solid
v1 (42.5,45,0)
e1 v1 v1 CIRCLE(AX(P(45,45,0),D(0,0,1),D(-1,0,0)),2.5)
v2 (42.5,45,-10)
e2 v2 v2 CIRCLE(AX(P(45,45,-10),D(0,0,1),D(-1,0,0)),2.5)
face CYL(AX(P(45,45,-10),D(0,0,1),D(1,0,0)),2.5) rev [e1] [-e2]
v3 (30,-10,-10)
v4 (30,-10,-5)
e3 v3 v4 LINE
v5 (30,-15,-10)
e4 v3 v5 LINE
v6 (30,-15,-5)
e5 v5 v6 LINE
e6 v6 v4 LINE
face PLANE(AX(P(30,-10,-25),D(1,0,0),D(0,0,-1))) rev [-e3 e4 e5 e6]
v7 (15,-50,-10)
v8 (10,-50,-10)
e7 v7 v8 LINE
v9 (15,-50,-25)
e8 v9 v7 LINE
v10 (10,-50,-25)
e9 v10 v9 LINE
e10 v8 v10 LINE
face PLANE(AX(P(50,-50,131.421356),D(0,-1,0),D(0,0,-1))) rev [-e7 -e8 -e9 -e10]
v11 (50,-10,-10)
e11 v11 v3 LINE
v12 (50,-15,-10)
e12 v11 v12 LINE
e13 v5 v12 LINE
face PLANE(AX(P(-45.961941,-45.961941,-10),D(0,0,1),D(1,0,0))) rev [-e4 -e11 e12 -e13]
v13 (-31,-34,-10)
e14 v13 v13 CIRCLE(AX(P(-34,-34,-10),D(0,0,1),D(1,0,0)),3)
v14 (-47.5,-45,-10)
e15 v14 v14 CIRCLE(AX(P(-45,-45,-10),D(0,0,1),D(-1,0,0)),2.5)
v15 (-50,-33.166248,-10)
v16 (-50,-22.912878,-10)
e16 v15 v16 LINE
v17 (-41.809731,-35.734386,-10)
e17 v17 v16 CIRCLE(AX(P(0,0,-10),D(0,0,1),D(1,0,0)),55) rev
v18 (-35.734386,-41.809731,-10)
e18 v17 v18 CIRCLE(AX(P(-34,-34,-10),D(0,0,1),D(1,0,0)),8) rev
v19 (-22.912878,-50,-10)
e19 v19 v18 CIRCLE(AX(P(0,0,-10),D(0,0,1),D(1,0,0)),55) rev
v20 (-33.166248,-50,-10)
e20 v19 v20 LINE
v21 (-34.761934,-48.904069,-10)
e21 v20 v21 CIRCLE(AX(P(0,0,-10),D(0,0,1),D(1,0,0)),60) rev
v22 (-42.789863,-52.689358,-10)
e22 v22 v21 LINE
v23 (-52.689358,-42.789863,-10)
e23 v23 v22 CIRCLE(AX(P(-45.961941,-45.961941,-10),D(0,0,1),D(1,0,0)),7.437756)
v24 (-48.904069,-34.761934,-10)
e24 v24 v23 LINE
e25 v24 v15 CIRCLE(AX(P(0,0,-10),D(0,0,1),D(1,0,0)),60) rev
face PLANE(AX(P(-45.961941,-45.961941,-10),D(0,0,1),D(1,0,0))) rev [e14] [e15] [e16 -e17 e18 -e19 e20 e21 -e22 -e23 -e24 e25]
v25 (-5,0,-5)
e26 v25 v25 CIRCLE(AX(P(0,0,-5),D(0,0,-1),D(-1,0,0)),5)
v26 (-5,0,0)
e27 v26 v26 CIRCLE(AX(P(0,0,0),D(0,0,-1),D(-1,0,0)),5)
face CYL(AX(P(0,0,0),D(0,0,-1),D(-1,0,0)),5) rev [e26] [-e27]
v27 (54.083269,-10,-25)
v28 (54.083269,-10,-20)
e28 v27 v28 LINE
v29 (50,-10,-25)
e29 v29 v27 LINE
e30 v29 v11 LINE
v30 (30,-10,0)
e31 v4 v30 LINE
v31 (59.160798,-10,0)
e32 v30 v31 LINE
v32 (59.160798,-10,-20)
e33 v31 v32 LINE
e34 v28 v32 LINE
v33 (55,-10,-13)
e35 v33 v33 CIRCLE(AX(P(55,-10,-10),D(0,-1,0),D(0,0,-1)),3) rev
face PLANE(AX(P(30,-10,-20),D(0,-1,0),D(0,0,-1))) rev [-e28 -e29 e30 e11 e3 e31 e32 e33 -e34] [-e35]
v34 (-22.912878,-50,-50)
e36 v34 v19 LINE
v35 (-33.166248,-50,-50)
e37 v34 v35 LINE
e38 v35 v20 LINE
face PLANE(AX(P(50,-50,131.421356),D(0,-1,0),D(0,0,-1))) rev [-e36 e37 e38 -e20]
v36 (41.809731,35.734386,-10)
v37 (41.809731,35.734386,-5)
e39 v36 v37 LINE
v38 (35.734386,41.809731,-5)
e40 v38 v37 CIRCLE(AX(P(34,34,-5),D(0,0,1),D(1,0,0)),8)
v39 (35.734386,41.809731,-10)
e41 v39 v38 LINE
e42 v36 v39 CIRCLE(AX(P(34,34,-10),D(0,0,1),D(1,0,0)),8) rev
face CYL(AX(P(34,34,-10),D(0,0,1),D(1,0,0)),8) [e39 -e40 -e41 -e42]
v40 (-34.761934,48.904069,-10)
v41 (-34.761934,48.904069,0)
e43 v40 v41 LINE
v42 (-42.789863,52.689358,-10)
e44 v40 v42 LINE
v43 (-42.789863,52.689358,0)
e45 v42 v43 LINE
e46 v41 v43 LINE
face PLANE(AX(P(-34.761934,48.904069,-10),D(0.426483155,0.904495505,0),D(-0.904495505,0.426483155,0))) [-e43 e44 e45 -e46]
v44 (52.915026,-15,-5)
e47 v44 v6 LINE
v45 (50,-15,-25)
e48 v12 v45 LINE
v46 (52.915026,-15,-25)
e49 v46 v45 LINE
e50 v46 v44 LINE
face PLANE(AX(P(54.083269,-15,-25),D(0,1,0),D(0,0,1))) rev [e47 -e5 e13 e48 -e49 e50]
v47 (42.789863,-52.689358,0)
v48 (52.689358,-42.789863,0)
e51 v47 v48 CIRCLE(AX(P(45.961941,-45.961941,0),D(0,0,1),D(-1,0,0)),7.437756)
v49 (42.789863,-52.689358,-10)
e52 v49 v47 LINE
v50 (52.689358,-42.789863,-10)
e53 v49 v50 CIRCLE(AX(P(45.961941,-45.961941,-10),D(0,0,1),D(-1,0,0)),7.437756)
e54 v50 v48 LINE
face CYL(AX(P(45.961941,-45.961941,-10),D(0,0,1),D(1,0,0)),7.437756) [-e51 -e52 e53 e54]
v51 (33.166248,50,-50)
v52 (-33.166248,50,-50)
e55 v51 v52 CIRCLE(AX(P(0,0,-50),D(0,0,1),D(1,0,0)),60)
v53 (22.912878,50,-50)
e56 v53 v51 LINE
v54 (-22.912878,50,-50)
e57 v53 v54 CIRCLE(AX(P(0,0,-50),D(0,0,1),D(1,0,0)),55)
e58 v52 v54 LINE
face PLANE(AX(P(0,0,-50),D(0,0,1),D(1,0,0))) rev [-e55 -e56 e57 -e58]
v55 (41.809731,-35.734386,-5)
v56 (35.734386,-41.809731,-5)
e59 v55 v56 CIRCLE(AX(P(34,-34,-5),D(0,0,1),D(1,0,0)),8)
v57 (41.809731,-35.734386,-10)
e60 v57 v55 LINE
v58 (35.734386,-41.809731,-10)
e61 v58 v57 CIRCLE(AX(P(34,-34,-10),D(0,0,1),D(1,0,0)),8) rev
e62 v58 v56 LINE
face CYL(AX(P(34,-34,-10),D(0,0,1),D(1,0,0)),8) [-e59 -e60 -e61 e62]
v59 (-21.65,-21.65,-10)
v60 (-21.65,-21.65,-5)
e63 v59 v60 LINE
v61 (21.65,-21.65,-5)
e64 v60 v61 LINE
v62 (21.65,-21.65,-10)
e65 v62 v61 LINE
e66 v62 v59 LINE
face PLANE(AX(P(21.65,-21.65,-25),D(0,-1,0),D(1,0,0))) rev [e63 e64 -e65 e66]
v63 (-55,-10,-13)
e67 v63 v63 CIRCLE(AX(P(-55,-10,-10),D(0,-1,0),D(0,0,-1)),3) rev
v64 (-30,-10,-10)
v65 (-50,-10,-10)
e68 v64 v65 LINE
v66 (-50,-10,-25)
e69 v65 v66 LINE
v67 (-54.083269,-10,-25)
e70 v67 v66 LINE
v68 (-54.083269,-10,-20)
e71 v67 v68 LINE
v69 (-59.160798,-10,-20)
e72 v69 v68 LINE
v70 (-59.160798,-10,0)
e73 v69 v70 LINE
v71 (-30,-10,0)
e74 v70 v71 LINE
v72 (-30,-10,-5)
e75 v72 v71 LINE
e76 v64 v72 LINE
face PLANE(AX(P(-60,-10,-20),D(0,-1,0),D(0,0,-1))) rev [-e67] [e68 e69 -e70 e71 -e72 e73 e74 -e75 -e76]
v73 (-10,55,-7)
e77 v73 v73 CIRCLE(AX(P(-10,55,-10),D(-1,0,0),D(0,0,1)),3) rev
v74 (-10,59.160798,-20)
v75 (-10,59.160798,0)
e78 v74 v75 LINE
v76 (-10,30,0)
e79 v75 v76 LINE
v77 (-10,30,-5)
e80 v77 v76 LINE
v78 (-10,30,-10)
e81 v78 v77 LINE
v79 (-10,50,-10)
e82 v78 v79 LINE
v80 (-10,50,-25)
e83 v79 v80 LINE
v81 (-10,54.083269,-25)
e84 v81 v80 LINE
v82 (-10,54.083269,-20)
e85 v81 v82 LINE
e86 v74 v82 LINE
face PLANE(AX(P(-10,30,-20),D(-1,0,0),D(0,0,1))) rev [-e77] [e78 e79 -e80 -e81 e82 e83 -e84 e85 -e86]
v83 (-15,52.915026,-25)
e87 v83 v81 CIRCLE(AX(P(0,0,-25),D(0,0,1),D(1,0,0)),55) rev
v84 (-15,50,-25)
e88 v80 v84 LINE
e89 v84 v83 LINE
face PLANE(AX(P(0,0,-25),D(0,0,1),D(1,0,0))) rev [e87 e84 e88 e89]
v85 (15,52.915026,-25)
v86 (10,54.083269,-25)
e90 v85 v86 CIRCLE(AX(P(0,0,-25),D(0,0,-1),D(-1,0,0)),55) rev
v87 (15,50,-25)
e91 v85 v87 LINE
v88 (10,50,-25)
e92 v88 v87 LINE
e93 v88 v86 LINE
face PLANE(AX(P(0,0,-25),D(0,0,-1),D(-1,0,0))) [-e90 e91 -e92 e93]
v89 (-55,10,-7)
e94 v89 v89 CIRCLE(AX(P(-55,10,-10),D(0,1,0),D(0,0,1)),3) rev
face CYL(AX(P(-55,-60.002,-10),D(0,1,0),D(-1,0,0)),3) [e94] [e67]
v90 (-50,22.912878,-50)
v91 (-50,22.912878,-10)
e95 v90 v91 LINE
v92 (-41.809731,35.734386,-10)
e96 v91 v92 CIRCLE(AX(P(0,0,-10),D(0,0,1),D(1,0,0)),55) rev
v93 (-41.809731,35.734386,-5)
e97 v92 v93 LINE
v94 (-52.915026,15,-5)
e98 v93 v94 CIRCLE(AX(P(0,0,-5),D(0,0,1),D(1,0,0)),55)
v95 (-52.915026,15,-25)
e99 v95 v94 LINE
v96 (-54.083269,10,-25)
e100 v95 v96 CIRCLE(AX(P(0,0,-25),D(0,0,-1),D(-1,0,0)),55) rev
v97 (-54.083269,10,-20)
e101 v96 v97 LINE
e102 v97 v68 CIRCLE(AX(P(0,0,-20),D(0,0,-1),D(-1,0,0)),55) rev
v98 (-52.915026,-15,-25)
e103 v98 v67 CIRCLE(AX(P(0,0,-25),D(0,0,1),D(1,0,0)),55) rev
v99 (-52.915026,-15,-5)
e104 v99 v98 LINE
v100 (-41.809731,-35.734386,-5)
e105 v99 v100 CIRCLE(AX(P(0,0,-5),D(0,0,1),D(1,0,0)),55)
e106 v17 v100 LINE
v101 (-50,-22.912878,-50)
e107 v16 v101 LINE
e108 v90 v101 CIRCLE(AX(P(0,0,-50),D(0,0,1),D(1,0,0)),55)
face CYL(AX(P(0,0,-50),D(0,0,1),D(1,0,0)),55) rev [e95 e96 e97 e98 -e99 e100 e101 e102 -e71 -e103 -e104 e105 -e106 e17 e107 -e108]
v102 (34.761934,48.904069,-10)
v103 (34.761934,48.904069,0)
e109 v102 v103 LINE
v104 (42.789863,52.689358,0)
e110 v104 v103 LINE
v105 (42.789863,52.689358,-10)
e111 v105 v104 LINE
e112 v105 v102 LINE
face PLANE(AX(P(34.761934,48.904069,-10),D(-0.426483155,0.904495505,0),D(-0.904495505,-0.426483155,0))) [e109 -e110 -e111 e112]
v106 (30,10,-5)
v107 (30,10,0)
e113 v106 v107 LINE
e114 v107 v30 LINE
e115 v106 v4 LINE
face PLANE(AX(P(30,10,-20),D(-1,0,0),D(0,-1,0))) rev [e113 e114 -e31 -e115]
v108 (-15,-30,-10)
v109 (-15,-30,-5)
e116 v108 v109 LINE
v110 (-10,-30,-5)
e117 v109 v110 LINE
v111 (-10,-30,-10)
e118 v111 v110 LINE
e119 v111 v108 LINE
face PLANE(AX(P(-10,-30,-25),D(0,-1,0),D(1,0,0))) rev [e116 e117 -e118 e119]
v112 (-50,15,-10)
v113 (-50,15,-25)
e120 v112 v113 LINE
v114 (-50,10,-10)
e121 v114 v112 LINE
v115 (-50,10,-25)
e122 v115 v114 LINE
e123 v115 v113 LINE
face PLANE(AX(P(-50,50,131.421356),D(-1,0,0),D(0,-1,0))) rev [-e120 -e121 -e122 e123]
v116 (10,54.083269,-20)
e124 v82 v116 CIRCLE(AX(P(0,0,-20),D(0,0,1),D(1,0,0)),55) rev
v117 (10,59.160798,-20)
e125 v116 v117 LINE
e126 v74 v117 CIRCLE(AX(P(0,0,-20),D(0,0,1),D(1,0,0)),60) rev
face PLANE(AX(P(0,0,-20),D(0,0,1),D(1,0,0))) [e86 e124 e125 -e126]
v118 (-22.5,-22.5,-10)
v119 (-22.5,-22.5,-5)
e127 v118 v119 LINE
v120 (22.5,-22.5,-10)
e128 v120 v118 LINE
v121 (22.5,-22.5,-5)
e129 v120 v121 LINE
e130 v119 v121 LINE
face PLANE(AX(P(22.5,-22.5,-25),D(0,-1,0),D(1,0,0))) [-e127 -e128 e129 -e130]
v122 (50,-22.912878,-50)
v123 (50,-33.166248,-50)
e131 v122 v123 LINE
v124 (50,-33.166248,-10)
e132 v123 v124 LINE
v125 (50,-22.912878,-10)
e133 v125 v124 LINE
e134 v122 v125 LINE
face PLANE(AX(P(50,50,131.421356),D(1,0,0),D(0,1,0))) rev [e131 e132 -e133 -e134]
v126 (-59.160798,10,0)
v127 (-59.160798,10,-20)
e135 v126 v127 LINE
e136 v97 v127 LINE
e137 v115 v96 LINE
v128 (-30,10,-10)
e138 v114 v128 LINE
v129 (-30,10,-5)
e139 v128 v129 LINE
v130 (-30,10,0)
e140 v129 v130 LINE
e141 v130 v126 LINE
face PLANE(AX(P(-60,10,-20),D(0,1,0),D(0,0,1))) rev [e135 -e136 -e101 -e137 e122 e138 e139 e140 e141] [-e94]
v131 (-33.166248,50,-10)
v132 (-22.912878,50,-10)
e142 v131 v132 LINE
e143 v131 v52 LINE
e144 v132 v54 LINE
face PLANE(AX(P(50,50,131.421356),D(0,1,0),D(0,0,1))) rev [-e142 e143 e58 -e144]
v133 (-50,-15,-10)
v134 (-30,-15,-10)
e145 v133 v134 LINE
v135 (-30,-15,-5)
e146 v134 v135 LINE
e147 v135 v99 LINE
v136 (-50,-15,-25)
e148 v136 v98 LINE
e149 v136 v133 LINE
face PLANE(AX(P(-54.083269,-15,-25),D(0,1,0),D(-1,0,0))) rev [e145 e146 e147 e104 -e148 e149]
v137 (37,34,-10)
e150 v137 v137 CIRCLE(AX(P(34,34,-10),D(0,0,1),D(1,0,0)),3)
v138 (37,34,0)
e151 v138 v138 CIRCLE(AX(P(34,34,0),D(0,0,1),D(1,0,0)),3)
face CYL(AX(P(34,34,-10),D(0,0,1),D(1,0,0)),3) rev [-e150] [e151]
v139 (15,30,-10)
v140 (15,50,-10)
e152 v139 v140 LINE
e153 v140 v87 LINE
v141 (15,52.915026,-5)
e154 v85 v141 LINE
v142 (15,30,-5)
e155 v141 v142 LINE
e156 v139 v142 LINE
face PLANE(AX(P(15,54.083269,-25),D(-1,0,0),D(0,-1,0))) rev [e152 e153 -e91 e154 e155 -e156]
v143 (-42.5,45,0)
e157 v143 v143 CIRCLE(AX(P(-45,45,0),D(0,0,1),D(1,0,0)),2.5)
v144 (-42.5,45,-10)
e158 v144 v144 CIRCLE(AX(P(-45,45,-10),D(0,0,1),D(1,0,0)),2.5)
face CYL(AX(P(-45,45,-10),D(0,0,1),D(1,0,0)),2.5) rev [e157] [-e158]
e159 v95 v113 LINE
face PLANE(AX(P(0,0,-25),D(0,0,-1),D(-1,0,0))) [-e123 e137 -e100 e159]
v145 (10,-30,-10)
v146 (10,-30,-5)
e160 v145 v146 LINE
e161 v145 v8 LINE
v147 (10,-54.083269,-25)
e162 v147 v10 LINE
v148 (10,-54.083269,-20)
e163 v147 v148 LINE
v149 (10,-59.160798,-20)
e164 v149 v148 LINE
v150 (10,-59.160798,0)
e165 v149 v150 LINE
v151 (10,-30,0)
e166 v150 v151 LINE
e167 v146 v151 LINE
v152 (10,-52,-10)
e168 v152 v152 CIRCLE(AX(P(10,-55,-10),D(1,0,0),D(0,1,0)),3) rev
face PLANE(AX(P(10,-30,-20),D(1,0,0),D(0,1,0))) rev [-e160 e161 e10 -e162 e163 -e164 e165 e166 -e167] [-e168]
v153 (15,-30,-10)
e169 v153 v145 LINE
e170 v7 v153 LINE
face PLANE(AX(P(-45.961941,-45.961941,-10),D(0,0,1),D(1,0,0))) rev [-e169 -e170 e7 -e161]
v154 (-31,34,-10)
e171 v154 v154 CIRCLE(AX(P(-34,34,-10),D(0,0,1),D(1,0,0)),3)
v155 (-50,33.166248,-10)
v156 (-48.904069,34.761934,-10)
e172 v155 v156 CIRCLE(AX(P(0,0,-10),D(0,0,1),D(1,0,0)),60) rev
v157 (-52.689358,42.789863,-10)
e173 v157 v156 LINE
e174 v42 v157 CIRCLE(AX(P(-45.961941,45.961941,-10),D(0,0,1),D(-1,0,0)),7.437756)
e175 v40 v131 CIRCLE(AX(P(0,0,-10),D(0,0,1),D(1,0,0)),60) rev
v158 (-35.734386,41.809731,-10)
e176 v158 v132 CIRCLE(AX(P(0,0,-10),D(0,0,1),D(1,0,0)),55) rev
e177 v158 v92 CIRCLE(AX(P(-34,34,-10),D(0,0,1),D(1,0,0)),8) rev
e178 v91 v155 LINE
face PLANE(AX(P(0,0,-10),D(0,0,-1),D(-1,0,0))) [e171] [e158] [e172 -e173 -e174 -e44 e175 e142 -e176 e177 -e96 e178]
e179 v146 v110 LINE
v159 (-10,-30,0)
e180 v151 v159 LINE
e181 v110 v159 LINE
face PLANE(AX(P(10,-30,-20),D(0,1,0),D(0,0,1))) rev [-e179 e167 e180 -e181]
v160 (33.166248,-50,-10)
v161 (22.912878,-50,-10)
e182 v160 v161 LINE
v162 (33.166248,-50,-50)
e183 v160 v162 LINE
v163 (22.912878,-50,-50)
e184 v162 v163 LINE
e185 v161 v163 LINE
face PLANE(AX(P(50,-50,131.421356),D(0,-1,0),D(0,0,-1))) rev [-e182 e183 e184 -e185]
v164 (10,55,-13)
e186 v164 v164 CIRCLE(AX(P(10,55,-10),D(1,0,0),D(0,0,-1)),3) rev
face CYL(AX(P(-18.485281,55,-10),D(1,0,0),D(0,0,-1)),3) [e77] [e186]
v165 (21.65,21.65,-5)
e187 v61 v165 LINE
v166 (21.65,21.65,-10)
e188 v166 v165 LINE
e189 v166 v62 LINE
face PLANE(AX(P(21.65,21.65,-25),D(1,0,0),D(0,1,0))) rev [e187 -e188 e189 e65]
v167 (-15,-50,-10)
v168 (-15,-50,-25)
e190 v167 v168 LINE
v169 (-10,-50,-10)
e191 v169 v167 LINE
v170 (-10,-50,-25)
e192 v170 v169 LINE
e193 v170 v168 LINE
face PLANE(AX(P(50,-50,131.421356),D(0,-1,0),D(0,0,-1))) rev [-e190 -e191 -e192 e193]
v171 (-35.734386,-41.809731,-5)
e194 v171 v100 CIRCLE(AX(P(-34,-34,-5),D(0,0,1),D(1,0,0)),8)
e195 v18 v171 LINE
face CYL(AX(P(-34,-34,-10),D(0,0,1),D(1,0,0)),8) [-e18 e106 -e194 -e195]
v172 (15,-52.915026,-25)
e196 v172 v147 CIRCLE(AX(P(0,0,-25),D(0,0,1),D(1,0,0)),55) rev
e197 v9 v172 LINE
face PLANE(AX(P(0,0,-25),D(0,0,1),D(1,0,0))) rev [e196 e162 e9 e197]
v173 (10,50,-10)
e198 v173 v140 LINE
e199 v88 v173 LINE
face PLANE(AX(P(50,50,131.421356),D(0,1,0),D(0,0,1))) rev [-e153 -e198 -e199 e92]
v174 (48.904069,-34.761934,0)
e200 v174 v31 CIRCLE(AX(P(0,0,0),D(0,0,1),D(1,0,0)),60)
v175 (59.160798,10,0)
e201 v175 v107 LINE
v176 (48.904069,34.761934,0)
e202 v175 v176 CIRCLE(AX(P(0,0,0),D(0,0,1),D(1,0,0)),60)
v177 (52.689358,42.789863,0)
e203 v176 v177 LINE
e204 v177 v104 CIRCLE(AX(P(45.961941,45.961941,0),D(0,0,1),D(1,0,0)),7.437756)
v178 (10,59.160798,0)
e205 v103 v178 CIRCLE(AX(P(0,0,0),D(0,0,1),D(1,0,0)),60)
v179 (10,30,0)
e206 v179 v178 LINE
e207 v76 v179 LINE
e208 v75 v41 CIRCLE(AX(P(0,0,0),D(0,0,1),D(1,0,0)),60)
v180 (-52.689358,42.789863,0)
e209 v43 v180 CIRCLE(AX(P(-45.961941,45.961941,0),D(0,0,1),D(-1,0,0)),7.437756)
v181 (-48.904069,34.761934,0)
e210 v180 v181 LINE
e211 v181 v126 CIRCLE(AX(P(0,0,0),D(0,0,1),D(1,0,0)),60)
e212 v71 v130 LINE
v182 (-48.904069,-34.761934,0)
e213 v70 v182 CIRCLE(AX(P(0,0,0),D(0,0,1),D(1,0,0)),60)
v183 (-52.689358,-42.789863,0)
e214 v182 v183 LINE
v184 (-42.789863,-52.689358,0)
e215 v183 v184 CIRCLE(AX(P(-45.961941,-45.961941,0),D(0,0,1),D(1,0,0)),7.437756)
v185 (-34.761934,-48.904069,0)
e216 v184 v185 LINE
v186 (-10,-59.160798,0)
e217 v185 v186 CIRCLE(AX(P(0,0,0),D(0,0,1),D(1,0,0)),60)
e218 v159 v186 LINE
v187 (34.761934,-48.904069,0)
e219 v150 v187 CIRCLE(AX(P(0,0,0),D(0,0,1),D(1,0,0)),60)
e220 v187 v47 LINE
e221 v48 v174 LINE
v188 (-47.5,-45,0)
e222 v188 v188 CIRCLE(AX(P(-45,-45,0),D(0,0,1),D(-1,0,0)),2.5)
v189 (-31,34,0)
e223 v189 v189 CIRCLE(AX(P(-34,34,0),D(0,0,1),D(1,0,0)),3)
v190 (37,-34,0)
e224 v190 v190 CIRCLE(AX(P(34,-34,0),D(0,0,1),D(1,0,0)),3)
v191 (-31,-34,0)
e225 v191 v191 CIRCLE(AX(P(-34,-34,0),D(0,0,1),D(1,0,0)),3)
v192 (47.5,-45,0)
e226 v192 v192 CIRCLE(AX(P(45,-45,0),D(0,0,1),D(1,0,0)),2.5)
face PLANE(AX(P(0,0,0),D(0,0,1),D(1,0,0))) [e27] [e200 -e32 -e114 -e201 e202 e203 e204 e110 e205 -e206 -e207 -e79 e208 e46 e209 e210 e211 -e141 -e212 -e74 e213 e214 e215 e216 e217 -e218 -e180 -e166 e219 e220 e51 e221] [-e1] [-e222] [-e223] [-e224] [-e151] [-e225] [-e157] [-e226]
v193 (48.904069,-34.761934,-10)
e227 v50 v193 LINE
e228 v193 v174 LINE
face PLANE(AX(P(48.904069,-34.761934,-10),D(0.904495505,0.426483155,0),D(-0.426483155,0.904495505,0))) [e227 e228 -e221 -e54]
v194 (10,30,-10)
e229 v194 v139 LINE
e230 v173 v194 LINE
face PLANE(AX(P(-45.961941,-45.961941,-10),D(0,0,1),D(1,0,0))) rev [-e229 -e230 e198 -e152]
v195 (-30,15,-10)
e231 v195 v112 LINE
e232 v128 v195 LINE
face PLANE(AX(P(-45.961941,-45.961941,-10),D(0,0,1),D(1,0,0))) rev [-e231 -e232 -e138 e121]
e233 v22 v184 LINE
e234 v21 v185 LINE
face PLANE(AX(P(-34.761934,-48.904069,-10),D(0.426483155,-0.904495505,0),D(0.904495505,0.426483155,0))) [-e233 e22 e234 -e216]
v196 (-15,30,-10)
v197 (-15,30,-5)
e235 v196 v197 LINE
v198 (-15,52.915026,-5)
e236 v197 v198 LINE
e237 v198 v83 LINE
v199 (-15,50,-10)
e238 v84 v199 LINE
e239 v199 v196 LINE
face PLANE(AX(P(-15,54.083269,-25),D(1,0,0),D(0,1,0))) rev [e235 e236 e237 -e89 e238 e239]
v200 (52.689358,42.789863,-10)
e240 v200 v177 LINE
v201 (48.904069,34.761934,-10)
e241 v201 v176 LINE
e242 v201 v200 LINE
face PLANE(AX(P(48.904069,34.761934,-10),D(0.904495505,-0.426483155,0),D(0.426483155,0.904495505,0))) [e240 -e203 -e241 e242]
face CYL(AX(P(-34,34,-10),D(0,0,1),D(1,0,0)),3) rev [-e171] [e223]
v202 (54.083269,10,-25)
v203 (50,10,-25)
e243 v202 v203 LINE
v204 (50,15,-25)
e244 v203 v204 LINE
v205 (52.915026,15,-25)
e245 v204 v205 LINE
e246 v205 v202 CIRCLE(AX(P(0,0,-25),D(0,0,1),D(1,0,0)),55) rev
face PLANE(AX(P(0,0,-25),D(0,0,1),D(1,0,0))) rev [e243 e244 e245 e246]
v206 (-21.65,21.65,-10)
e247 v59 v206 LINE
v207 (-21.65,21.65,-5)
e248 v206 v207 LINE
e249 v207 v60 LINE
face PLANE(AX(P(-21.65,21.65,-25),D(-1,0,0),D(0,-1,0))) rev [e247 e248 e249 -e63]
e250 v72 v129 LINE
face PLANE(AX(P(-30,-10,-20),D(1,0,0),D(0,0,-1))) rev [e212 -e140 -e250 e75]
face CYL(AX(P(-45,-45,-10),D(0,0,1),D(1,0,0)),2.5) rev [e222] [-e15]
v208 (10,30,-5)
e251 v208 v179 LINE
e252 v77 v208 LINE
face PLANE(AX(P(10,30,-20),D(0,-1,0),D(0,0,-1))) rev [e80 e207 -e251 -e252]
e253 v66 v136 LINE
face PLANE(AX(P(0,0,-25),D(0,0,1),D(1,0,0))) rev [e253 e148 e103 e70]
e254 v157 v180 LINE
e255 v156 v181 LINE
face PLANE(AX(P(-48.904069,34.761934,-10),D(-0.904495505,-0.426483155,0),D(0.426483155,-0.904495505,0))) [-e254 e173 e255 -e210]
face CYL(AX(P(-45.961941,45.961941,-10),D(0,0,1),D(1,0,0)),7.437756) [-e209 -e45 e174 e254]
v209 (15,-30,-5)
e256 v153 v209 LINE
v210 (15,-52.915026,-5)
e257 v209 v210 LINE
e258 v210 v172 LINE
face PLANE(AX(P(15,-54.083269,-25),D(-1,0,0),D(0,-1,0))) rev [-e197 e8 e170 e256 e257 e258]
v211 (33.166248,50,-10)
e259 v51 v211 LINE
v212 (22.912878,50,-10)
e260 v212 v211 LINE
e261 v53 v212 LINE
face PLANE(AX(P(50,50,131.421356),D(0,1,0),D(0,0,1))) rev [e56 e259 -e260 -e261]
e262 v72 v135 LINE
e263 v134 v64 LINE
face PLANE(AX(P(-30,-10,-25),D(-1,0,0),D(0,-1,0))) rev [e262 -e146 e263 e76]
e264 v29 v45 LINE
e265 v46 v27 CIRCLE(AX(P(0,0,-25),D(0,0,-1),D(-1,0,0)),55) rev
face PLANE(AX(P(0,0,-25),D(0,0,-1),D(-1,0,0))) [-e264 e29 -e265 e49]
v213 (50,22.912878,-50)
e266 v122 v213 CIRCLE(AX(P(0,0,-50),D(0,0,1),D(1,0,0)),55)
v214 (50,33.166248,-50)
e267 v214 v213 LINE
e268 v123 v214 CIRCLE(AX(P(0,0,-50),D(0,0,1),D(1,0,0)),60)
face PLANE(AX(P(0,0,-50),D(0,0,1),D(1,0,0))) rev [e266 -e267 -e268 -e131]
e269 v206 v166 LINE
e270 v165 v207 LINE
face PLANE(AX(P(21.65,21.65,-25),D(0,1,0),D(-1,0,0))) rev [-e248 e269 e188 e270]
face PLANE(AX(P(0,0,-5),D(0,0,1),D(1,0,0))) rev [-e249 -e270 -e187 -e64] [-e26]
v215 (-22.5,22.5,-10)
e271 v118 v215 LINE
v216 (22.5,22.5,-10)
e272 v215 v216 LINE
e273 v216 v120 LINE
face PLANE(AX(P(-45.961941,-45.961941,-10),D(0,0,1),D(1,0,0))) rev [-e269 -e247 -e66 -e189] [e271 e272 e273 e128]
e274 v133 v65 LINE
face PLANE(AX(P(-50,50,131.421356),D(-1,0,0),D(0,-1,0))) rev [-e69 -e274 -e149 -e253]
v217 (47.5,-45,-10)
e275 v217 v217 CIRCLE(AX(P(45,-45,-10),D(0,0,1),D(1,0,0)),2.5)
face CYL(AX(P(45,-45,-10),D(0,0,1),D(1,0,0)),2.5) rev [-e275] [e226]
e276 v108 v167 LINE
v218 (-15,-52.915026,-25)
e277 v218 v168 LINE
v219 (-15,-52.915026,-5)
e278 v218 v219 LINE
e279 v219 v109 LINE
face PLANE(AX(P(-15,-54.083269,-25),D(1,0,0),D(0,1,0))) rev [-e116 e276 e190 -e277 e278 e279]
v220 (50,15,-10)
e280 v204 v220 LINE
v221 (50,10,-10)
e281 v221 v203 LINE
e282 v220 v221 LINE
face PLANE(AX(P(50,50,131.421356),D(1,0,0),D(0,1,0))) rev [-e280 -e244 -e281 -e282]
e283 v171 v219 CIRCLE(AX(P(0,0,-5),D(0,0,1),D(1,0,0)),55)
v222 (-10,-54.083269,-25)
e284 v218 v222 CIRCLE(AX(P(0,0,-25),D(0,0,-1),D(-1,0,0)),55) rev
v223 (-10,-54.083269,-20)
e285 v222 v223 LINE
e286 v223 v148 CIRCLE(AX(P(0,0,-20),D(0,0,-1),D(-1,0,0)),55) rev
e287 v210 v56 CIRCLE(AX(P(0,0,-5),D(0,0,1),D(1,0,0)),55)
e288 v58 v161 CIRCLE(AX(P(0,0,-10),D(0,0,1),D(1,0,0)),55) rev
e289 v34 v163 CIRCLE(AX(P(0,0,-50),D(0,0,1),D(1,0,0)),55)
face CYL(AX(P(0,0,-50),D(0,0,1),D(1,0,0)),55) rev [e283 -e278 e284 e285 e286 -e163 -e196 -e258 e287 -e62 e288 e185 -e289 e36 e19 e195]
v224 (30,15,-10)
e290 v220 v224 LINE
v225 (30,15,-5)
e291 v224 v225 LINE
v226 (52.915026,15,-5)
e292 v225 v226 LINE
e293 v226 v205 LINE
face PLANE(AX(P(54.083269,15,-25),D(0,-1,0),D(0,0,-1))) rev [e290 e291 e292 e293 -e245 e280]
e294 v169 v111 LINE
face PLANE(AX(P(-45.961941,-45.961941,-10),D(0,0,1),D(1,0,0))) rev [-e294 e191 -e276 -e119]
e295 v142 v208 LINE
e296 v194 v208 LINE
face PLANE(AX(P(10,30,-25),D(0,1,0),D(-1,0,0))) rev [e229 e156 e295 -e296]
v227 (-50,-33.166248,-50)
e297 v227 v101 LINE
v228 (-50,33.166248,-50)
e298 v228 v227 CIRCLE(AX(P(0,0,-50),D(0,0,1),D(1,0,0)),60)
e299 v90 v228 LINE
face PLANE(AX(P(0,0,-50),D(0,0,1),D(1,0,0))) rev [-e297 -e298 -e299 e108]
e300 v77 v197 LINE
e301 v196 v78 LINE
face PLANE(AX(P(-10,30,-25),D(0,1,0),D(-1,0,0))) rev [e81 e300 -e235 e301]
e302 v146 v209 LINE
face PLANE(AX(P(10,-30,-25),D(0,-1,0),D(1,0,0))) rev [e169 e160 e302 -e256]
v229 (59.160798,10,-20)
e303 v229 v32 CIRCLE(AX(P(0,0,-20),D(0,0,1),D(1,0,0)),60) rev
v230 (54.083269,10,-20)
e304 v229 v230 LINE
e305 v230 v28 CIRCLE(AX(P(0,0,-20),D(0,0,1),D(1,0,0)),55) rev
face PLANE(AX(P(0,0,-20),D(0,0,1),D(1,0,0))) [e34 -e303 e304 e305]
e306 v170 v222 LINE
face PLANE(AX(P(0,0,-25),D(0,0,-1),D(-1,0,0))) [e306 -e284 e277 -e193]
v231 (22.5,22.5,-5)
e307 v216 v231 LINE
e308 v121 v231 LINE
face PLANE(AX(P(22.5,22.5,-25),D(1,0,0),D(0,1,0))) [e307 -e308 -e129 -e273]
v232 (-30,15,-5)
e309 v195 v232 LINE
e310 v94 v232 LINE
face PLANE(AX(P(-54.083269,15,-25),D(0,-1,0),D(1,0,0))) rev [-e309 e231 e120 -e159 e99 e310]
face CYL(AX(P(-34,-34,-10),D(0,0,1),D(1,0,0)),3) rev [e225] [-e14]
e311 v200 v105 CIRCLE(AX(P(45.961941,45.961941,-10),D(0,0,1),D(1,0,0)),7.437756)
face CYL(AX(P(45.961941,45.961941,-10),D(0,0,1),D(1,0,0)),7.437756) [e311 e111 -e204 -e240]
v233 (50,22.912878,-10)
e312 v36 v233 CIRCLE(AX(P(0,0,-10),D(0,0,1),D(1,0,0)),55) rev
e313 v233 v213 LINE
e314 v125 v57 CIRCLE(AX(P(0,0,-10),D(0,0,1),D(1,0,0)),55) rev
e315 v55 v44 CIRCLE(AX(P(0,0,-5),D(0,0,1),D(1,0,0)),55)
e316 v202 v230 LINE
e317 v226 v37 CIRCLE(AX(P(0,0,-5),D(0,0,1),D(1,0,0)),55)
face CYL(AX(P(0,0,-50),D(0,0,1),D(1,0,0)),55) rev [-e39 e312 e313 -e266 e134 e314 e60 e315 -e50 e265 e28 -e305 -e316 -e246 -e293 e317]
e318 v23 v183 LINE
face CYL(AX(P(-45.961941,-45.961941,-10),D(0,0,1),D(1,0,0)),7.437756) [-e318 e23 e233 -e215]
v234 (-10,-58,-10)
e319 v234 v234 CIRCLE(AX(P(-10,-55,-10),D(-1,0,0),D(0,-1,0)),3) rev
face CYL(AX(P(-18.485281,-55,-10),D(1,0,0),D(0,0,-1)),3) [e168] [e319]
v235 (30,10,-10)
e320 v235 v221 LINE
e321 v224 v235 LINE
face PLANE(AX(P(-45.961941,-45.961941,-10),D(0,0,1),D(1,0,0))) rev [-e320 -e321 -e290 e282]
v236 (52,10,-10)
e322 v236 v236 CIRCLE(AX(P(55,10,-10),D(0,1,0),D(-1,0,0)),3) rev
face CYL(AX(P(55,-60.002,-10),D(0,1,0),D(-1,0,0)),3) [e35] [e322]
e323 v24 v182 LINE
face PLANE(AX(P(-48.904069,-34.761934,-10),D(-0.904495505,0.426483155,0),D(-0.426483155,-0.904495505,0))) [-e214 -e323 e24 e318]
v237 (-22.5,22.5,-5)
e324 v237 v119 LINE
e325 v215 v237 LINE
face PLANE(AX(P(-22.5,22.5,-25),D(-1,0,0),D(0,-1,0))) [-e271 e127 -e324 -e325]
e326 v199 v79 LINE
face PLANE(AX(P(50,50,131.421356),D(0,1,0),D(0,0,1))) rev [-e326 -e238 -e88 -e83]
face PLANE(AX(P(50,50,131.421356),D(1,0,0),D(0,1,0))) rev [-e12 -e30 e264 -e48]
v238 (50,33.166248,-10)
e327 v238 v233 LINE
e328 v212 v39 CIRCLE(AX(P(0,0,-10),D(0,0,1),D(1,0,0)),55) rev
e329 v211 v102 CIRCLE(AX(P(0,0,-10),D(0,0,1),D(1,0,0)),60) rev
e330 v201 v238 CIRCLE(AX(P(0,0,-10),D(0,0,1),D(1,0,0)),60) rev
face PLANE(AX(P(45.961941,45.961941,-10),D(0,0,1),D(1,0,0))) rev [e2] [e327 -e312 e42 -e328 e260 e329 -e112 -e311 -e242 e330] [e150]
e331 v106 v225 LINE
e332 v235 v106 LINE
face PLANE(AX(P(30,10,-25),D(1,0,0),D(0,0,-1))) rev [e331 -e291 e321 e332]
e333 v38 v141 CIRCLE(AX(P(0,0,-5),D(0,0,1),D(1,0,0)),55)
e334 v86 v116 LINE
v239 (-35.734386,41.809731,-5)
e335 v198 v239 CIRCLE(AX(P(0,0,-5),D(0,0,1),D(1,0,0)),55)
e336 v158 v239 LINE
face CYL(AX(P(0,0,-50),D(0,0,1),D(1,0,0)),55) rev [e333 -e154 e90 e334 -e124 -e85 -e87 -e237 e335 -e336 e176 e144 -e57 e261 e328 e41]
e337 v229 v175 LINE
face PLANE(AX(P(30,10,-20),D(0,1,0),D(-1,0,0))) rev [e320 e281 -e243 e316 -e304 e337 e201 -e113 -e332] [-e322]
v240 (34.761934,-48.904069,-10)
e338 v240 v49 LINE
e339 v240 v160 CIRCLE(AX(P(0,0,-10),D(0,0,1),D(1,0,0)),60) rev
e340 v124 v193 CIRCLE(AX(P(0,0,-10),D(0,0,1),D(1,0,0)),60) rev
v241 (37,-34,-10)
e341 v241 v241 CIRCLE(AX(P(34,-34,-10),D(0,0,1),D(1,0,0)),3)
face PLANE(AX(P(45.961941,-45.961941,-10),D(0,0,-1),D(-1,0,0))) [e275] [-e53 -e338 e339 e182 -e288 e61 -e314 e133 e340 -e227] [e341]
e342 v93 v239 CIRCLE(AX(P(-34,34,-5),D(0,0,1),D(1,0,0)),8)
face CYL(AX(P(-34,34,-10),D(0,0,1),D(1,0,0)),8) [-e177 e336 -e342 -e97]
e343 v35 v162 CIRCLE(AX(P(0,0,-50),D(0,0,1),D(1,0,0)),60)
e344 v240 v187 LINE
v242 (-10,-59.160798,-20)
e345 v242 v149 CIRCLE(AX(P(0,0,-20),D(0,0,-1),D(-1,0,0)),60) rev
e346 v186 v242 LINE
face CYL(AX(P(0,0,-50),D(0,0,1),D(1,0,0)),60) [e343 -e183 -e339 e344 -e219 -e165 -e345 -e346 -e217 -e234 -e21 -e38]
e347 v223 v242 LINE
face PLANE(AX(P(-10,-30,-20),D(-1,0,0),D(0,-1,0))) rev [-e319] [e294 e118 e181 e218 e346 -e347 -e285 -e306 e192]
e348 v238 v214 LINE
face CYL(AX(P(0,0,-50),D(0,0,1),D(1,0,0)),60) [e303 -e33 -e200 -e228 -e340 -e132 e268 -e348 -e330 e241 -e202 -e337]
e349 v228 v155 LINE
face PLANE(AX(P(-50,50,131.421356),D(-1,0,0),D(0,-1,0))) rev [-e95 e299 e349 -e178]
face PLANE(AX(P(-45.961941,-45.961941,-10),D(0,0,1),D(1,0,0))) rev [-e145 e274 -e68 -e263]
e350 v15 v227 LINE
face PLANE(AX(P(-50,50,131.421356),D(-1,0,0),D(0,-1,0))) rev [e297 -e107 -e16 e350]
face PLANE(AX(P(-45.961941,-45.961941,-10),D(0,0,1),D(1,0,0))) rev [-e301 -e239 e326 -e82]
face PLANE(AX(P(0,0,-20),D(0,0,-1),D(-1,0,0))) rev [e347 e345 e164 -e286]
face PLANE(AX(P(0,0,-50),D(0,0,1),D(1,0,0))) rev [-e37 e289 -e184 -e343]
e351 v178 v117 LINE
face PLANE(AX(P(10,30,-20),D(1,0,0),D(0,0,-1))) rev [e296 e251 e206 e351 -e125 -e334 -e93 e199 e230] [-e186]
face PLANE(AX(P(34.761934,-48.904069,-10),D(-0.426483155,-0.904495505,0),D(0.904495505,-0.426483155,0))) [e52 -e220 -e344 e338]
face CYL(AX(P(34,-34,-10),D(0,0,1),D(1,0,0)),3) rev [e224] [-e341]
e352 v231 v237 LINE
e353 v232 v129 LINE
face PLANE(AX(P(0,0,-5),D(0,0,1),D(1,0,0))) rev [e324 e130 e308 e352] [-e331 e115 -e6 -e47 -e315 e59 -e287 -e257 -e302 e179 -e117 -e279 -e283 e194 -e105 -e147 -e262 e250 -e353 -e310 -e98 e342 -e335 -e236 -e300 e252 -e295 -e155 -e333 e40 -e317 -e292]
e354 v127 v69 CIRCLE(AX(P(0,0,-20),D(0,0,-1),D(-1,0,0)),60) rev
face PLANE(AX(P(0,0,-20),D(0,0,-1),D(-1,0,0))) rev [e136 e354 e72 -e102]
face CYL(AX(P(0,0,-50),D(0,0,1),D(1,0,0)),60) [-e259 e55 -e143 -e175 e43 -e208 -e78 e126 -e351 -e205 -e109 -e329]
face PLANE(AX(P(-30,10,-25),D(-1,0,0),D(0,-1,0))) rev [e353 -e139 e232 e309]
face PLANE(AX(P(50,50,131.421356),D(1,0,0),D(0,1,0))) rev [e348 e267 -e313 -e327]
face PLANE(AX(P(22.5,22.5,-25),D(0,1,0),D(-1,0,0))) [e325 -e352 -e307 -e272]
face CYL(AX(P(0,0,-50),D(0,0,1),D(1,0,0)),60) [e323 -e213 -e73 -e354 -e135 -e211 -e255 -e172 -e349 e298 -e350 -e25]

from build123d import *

# Parameters (mm, degrees)
SKETCH_1_R          = 60
EXTRUDE_1_DEPTH     = 50
SKETCH_2_R          = 3
CUT_EXTRUDE_1_DEPTH = 10
SHELL_START         = -50
SHELL_1_DEPTH       = 45
SHELL_1_2_DEPTH     = 35
SKETCH_3_W          = 45
SKETCH_3_H          = 45
SKETCH_3_W_2        = 43.3
SKETCH_3_H_2        = 43.3
EXTRUDE_2_DEPTH     = 25
SKETCH_4_R          = 5
CUT_EXTRUDE_2_DEPTH = 97.046863561
SKETCH_5_W          = 30
SKETCH_5_H          = 20
SKETCH_5_W_2        = 20
SKETCH_5_H_2        = 30
CUT_EXTRUDE_3_DEPTH = 20
SKETCH_6_W          = 24.083269132
SKETCH_6_H          = 5
SKETCH_6_W_2        = 5
SKETCH_6_H_2        = 24.083269132
EXTRUDE_3_DEPTH     = 20
SKETCH_7_R          = 3
EXTRUDE_4_DEPTH     = 20
EXTRUDE_5_REACH     = 106.881
SKETCH_8_R          = 3
SKETCH_10_R         = 2.5
EXTRUDE_6_DEPTH     = 10
SKETCH_11_W         = 100
SKETCH_11_H         = 100
CUT_EXTRUDE_4_DEPTH = 40


# Read off the part's stored shape, not the designer's step: 抽壳1
with BuildPart() as part:
    # 草图1 → 凸台-拉伸1 (new body)
    with BuildSketch(Plane.XY):
        Circle(SKETCH_1_R)
    extrude(amount=-EXTRUDE_1_DEPTH)

    # 草图2 → 切除-拉伸1 (cut)
    with BuildSketch(Plane.XY):
        with Locations((34, 34)):
            Circle(SKETCH_2_R)
        with Locations((34, -34)):
            Circle(SKETCH_2_R)
        with Locations((-34, -34)):
            Circle(SKETCH_2_R)
        with Locations((-34, 34)):
            Circle(SKETCH_2_R)
    extrude(amount=-CUT_EXTRUDE_1_DEPTH, mode=Mode.SUBTRACT)

    # 抽壳1 outline → 抽壳1 (cut)
    with BuildSketch(Plane.XY.offset(SHELL_START)):
        with BuildLine():
            ThreePointArc((41.809731384, -35.734386263), (55, 0), (41.809731384, 35.734386263))
            ThreePointArc((41.809731384, 35.734386263), (28.343145751, 28.343145751), (35.734386263, 41.809731384))
            ThreePointArc((35.734386263, 41.809731384), (0, 55), (-35.734386263, 41.809731384))
            ThreePointArc((-35.734386263, 41.809731384), (-28.343145751, 28.343145751), (-41.809731384, 35.734386263))
            ThreePointArc((-41.809731384, 35.734386263), (-55, 0), (-41.809731384, -35.734386263))
            ThreePointArc((-41.809731384, -35.734386263), (-28.343145751, -28.343145751), (-35.734386263, -41.809731384))
            ThreePointArc((-35.734386263, -41.809731384), (0, -55), (35.734386263, -41.809731384))
            ThreePointArc((35.734386263, -41.809731384), (28.343145751, -28.343145751), (41.809731384, -35.734386263))
        make_face()
    extrude(amount=SHELL_1_DEPTH, mode=Mode.SUBTRACT)

    # Shell 1 2 outline → Shell 1 2 (cut)
    with BuildSketch(Plane.XY.offset(SHELL_START)):
        with BuildLine():
            ThreePointArc((35.734386263, 41.809731384), (28.343145751, 28.343145751), (41.809731384, 35.734386263))
            ThreePointArc((41.809731384, 35.734386263), (38.890872965, 38.890872965), (35.734386263, 41.809731384))
        make_face()
        with BuildLine():
            ThreePointArc((35.734386263, -41.809731384), (38.890872965, -38.890872965), (41.809731384, -35.734386263))
            ThreePointArc((41.809731384, -35.734386263), (28.343145751, -28.343145751), (35.734386263, -41.809731384))
        make_face()
        with BuildLine():
            ThreePointArc((-41.809731384, 35.734386263), (-28.343145751, 28.343145751), (-35.734386263, 41.809731384))
            ThreePointArc((-35.734386263, 41.809731384), (-38.890872965, 38.890872965), (-41.809731384, 35.734386263))
        make_face()
        with BuildLine():
            ThreePointArc((-41.809731384, -35.734386263), (-38.890872965, -38.890872965), (-35.734386263, -41.809731384))
            ThreePointArc((-35.734386263, -41.809731384), (-28.343145751, -28.343145751), (-41.809731384, -35.734386263))
        make_face()
    extrude(amount=SHELL_1_2_DEPTH, mode=Mode.SUBTRACT)

    # 草图3 → 凸台-拉伸2 (add)
    with BuildSketch(Plane.XY):
        Rectangle(SKETCH_3_W, SKETCH_3_H)
        Rectangle(SKETCH_3_W_2, SKETCH_3_H_2, mode=Mode.SUBTRACT)
    extrude(amount=-EXTRUDE_2_DEPTH)

    # 草图4 → 切除-拉伸2 (cut, through all)
    with BuildSketch(Plane(origin=(0, 0, -5), x_dir=(-1, 0, 0), z_dir=(0, 0, -1))):
        Circle(SKETCH_4_R)
    extrude(amount=-CUT_EXTRUDE_2_DEPTH, mode=Mode.SUBTRACT)

    # 草图5 → 切除-拉伸3 (cut)
    with BuildSketch(Plane.XY):
        with Locations((-45, 0)):
            Rectangle(SKETCH_5_W, SKETCH_5_H)
        with Locations((0, 45)):
            Rectangle(SKETCH_5_W_2, SKETCH_5_H_2)
        with Locations((45, 0)):
            Rectangle(SKETCH_5_W, SKETCH_5_H)
        with Locations((0, -45)):
            Rectangle(SKETCH_5_W_2, SKETCH_5_H_2)
    extrude(amount=-CUT_EXTRUDE_3_DEPTH, mode=Mode.SUBTRACT)

    # 草图6 → 凸台-拉伸3 (add)
    with BuildSketch(Plane(origin=(0, 0, -5), x_dir=(-1, 0, 0), z_dir=(0, 0, -1))):
        with Locations((-42.041634566, 12.5)):
            Rectangle(SKETCH_6_W, SKETCH_6_H)
        with Locations((-42.041634566, -12.5)):
            Rectangle(SKETCH_6_W, SKETCH_6_H)
        with Locations((12.5, 42.041634566)):
            Rectangle(SKETCH_6_W_2, SKETCH_6_H_2)
        with Locations((-12.5, 42.041634566)):
            Rectangle(SKETCH_6_W_2, SKETCH_6_H_2)
        with Locations((42.041634566, -12.5)):
            Rectangle(SKETCH_6_W, SKETCH_6_H)
        with Locations((42.041634566, 12.5)):
            Rectangle(SKETCH_6_W, SKETCH_6_H)
        with Locations((-12.5, -42.041634566)):
            Rectangle(SKETCH_6_W_2, SKETCH_6_H_2)
        with Locations((12.5, -42.041634566)):
            Rectangle(SKETCH_6_W_2, SKETCH_6_H_2)
    extrude(amount=EXTRUDE_3_DEPTH)

    # 草图7 → 凸台-拉伸4 (add)
    with BuildSketch(Plane.ZY.offset(-10)):
        with Locations(Location((-10, 55, 0), (0, 0, 180))):
            Circle(SKETCH_7_R)
        with Locations(Location((-10, -55, 0), (0, 0, 90))):
            Circle(SKETCH_7_R)
    extrude(amount=EXTRUDE_4_DEPTH)

    # 草图8 → 凸台-拉伸5 (add, up to next)
    with BuildSketch(Plane.XZ.offset(-10), mode=Mode.PRIVATE) as extrude_5_sk1:
        with Locations(Location((55, -10, 0), (0, 0, 180))):
            Circle(SKETCH_8_R)
    extrude_5_tool1 = extrude(extrude_5_sk1.sketch, amount=EXTRUDE_5_REACH, mode=Mode.PRIVATE) - part.part
    # 草图8 → 凸台-拉伸5 (add, up to next)
    with BuildSketch(Plane.XZ.offset(-10), mode=Mode.PRIVATE) as extrude_5_sk2:
        with Locations(Location((-55, -10, 0), (0, 0, 90))):
            Circle(SKETCH_8_R)
    extrude_5_tool2 = extrude(extrude_5_sk2.sketch, amount=EXTRUDE_5_REACH, mode=Mode.PRIVATE) - part.part
    add(extrude_5_tool1.solids().sort_by_distance((55, 10, -10))[0])
    add(extrude_5_tool2.solids().sort_by_distance((-55, 10, -10))[0])

    # 草图10 → 凸台-拉伸6 (add)
    # profile 1 of 4: a face of its own
    with BuildSketch(Plane.XY):
        with BuildLine():
            Line((-48.904069139, 34.761933515), (-52.68935793, 42.789862994))
            ThreePointArc((-52.68935793, 42.789862994), (-51.221228705, 51.221228705), (-42.789862994, 52.68935793))
            Line((-42.789862994, 52.68935793), (-34.761933515, 48.904069139))
            ThreePointArc((-34.761933515, 48.904069139), (-42.426406871, 42.426406871), (-48.904069139, 34.761933515))
        make_face()
        with Locations((-45, 45)):
            Circle(SKETCH_10_R, mode=Mode.SUBTRACT)
    # profile 2 of 4: a face of its own
    with BuildSketch(Plane.XY):
        with BuildLine():
            Line((34.761933515, 48.904069139), (42.789862994, 52.68935793))
            ThreePointArc((42.789862994, 52.68935793), (51.221228705, 51.221228705), (52.68935793, 42.789862994))
            Line((52.68935793, 42.789862994), (48.904069139, 34.761933515))
            ThreePointArc((48.904069139, 34.761933515), (42.426406871, 42.426406871), (34.761933515, 48.904069139))
        make_face()
        with Locations(Location((45, 45, 0), (0, 0, 180))):
            Circle(SKETCH_10_R, mode=Mode.SUBTRACT)
    # profile 3 of 4: a face of its own
    with BuildSketch(Plane.XY):
        with BuildLine():
            Line((48.904069139, -34.761933515), (52.68935793, -42.789862994))
            ThreePointArc((52.68935793, -42.789862994), (51.221228705, -51.221228705), (42.789862994, -52.68935793))
            Line((42.789862994, -52.68935793), (34.761933515, -48.904069139))
            ThreePointArc((34.761933515, -48.904069139), (42.426406871, -42.426406871), (48.904069139, -34.761933515))
        make_face()
        with Locations((45, -45)):
            Circle(SKETCH_10_R, mode=Mode.SUBTRACT)
    # profile 4 of 4: a face of its own
    with BuildSketch(Plane.XY):
        with BuildLine():
            Line((-34.761933515, -48.904069139), (-42.789862994, -52.68935793))
            ThreePointArc((-42.789862994, -52.68935793), (-51.221228705, -51.221228705), (-52.68935793, -42.789862994))
            Line((-52.68935793, -42.789862994), (-48.904069139, -34.761933515))
            ThreePointArc((-48.904069139, -34.761933515), (-42.426406871, -42.426406871), (-34.761933515, -48.904069139))
        make_face()
        with Locations(Location((-45, -45, 0), (0, 0, 180))):
            Circle(SKETCH_10_R, mode=Mode.SUBTRACT)
    extrude(amount=-EXTRUDE_6_DEPTH)

    # 草图11 → 切除-拉伸4 (cut)
    with BuildSketch(Plane(origin=(0, 0, -50), x_dir=(-1, 0, 0), z_dir=(0, 0, -1))):
        Rectangle(SKETCH_11_W, SKETCH_11_H)
    extrude(amount=-CUT_EXTRUDE_4_DEPTH, mode=Mode.SUBTRACT)


solid = part.part
